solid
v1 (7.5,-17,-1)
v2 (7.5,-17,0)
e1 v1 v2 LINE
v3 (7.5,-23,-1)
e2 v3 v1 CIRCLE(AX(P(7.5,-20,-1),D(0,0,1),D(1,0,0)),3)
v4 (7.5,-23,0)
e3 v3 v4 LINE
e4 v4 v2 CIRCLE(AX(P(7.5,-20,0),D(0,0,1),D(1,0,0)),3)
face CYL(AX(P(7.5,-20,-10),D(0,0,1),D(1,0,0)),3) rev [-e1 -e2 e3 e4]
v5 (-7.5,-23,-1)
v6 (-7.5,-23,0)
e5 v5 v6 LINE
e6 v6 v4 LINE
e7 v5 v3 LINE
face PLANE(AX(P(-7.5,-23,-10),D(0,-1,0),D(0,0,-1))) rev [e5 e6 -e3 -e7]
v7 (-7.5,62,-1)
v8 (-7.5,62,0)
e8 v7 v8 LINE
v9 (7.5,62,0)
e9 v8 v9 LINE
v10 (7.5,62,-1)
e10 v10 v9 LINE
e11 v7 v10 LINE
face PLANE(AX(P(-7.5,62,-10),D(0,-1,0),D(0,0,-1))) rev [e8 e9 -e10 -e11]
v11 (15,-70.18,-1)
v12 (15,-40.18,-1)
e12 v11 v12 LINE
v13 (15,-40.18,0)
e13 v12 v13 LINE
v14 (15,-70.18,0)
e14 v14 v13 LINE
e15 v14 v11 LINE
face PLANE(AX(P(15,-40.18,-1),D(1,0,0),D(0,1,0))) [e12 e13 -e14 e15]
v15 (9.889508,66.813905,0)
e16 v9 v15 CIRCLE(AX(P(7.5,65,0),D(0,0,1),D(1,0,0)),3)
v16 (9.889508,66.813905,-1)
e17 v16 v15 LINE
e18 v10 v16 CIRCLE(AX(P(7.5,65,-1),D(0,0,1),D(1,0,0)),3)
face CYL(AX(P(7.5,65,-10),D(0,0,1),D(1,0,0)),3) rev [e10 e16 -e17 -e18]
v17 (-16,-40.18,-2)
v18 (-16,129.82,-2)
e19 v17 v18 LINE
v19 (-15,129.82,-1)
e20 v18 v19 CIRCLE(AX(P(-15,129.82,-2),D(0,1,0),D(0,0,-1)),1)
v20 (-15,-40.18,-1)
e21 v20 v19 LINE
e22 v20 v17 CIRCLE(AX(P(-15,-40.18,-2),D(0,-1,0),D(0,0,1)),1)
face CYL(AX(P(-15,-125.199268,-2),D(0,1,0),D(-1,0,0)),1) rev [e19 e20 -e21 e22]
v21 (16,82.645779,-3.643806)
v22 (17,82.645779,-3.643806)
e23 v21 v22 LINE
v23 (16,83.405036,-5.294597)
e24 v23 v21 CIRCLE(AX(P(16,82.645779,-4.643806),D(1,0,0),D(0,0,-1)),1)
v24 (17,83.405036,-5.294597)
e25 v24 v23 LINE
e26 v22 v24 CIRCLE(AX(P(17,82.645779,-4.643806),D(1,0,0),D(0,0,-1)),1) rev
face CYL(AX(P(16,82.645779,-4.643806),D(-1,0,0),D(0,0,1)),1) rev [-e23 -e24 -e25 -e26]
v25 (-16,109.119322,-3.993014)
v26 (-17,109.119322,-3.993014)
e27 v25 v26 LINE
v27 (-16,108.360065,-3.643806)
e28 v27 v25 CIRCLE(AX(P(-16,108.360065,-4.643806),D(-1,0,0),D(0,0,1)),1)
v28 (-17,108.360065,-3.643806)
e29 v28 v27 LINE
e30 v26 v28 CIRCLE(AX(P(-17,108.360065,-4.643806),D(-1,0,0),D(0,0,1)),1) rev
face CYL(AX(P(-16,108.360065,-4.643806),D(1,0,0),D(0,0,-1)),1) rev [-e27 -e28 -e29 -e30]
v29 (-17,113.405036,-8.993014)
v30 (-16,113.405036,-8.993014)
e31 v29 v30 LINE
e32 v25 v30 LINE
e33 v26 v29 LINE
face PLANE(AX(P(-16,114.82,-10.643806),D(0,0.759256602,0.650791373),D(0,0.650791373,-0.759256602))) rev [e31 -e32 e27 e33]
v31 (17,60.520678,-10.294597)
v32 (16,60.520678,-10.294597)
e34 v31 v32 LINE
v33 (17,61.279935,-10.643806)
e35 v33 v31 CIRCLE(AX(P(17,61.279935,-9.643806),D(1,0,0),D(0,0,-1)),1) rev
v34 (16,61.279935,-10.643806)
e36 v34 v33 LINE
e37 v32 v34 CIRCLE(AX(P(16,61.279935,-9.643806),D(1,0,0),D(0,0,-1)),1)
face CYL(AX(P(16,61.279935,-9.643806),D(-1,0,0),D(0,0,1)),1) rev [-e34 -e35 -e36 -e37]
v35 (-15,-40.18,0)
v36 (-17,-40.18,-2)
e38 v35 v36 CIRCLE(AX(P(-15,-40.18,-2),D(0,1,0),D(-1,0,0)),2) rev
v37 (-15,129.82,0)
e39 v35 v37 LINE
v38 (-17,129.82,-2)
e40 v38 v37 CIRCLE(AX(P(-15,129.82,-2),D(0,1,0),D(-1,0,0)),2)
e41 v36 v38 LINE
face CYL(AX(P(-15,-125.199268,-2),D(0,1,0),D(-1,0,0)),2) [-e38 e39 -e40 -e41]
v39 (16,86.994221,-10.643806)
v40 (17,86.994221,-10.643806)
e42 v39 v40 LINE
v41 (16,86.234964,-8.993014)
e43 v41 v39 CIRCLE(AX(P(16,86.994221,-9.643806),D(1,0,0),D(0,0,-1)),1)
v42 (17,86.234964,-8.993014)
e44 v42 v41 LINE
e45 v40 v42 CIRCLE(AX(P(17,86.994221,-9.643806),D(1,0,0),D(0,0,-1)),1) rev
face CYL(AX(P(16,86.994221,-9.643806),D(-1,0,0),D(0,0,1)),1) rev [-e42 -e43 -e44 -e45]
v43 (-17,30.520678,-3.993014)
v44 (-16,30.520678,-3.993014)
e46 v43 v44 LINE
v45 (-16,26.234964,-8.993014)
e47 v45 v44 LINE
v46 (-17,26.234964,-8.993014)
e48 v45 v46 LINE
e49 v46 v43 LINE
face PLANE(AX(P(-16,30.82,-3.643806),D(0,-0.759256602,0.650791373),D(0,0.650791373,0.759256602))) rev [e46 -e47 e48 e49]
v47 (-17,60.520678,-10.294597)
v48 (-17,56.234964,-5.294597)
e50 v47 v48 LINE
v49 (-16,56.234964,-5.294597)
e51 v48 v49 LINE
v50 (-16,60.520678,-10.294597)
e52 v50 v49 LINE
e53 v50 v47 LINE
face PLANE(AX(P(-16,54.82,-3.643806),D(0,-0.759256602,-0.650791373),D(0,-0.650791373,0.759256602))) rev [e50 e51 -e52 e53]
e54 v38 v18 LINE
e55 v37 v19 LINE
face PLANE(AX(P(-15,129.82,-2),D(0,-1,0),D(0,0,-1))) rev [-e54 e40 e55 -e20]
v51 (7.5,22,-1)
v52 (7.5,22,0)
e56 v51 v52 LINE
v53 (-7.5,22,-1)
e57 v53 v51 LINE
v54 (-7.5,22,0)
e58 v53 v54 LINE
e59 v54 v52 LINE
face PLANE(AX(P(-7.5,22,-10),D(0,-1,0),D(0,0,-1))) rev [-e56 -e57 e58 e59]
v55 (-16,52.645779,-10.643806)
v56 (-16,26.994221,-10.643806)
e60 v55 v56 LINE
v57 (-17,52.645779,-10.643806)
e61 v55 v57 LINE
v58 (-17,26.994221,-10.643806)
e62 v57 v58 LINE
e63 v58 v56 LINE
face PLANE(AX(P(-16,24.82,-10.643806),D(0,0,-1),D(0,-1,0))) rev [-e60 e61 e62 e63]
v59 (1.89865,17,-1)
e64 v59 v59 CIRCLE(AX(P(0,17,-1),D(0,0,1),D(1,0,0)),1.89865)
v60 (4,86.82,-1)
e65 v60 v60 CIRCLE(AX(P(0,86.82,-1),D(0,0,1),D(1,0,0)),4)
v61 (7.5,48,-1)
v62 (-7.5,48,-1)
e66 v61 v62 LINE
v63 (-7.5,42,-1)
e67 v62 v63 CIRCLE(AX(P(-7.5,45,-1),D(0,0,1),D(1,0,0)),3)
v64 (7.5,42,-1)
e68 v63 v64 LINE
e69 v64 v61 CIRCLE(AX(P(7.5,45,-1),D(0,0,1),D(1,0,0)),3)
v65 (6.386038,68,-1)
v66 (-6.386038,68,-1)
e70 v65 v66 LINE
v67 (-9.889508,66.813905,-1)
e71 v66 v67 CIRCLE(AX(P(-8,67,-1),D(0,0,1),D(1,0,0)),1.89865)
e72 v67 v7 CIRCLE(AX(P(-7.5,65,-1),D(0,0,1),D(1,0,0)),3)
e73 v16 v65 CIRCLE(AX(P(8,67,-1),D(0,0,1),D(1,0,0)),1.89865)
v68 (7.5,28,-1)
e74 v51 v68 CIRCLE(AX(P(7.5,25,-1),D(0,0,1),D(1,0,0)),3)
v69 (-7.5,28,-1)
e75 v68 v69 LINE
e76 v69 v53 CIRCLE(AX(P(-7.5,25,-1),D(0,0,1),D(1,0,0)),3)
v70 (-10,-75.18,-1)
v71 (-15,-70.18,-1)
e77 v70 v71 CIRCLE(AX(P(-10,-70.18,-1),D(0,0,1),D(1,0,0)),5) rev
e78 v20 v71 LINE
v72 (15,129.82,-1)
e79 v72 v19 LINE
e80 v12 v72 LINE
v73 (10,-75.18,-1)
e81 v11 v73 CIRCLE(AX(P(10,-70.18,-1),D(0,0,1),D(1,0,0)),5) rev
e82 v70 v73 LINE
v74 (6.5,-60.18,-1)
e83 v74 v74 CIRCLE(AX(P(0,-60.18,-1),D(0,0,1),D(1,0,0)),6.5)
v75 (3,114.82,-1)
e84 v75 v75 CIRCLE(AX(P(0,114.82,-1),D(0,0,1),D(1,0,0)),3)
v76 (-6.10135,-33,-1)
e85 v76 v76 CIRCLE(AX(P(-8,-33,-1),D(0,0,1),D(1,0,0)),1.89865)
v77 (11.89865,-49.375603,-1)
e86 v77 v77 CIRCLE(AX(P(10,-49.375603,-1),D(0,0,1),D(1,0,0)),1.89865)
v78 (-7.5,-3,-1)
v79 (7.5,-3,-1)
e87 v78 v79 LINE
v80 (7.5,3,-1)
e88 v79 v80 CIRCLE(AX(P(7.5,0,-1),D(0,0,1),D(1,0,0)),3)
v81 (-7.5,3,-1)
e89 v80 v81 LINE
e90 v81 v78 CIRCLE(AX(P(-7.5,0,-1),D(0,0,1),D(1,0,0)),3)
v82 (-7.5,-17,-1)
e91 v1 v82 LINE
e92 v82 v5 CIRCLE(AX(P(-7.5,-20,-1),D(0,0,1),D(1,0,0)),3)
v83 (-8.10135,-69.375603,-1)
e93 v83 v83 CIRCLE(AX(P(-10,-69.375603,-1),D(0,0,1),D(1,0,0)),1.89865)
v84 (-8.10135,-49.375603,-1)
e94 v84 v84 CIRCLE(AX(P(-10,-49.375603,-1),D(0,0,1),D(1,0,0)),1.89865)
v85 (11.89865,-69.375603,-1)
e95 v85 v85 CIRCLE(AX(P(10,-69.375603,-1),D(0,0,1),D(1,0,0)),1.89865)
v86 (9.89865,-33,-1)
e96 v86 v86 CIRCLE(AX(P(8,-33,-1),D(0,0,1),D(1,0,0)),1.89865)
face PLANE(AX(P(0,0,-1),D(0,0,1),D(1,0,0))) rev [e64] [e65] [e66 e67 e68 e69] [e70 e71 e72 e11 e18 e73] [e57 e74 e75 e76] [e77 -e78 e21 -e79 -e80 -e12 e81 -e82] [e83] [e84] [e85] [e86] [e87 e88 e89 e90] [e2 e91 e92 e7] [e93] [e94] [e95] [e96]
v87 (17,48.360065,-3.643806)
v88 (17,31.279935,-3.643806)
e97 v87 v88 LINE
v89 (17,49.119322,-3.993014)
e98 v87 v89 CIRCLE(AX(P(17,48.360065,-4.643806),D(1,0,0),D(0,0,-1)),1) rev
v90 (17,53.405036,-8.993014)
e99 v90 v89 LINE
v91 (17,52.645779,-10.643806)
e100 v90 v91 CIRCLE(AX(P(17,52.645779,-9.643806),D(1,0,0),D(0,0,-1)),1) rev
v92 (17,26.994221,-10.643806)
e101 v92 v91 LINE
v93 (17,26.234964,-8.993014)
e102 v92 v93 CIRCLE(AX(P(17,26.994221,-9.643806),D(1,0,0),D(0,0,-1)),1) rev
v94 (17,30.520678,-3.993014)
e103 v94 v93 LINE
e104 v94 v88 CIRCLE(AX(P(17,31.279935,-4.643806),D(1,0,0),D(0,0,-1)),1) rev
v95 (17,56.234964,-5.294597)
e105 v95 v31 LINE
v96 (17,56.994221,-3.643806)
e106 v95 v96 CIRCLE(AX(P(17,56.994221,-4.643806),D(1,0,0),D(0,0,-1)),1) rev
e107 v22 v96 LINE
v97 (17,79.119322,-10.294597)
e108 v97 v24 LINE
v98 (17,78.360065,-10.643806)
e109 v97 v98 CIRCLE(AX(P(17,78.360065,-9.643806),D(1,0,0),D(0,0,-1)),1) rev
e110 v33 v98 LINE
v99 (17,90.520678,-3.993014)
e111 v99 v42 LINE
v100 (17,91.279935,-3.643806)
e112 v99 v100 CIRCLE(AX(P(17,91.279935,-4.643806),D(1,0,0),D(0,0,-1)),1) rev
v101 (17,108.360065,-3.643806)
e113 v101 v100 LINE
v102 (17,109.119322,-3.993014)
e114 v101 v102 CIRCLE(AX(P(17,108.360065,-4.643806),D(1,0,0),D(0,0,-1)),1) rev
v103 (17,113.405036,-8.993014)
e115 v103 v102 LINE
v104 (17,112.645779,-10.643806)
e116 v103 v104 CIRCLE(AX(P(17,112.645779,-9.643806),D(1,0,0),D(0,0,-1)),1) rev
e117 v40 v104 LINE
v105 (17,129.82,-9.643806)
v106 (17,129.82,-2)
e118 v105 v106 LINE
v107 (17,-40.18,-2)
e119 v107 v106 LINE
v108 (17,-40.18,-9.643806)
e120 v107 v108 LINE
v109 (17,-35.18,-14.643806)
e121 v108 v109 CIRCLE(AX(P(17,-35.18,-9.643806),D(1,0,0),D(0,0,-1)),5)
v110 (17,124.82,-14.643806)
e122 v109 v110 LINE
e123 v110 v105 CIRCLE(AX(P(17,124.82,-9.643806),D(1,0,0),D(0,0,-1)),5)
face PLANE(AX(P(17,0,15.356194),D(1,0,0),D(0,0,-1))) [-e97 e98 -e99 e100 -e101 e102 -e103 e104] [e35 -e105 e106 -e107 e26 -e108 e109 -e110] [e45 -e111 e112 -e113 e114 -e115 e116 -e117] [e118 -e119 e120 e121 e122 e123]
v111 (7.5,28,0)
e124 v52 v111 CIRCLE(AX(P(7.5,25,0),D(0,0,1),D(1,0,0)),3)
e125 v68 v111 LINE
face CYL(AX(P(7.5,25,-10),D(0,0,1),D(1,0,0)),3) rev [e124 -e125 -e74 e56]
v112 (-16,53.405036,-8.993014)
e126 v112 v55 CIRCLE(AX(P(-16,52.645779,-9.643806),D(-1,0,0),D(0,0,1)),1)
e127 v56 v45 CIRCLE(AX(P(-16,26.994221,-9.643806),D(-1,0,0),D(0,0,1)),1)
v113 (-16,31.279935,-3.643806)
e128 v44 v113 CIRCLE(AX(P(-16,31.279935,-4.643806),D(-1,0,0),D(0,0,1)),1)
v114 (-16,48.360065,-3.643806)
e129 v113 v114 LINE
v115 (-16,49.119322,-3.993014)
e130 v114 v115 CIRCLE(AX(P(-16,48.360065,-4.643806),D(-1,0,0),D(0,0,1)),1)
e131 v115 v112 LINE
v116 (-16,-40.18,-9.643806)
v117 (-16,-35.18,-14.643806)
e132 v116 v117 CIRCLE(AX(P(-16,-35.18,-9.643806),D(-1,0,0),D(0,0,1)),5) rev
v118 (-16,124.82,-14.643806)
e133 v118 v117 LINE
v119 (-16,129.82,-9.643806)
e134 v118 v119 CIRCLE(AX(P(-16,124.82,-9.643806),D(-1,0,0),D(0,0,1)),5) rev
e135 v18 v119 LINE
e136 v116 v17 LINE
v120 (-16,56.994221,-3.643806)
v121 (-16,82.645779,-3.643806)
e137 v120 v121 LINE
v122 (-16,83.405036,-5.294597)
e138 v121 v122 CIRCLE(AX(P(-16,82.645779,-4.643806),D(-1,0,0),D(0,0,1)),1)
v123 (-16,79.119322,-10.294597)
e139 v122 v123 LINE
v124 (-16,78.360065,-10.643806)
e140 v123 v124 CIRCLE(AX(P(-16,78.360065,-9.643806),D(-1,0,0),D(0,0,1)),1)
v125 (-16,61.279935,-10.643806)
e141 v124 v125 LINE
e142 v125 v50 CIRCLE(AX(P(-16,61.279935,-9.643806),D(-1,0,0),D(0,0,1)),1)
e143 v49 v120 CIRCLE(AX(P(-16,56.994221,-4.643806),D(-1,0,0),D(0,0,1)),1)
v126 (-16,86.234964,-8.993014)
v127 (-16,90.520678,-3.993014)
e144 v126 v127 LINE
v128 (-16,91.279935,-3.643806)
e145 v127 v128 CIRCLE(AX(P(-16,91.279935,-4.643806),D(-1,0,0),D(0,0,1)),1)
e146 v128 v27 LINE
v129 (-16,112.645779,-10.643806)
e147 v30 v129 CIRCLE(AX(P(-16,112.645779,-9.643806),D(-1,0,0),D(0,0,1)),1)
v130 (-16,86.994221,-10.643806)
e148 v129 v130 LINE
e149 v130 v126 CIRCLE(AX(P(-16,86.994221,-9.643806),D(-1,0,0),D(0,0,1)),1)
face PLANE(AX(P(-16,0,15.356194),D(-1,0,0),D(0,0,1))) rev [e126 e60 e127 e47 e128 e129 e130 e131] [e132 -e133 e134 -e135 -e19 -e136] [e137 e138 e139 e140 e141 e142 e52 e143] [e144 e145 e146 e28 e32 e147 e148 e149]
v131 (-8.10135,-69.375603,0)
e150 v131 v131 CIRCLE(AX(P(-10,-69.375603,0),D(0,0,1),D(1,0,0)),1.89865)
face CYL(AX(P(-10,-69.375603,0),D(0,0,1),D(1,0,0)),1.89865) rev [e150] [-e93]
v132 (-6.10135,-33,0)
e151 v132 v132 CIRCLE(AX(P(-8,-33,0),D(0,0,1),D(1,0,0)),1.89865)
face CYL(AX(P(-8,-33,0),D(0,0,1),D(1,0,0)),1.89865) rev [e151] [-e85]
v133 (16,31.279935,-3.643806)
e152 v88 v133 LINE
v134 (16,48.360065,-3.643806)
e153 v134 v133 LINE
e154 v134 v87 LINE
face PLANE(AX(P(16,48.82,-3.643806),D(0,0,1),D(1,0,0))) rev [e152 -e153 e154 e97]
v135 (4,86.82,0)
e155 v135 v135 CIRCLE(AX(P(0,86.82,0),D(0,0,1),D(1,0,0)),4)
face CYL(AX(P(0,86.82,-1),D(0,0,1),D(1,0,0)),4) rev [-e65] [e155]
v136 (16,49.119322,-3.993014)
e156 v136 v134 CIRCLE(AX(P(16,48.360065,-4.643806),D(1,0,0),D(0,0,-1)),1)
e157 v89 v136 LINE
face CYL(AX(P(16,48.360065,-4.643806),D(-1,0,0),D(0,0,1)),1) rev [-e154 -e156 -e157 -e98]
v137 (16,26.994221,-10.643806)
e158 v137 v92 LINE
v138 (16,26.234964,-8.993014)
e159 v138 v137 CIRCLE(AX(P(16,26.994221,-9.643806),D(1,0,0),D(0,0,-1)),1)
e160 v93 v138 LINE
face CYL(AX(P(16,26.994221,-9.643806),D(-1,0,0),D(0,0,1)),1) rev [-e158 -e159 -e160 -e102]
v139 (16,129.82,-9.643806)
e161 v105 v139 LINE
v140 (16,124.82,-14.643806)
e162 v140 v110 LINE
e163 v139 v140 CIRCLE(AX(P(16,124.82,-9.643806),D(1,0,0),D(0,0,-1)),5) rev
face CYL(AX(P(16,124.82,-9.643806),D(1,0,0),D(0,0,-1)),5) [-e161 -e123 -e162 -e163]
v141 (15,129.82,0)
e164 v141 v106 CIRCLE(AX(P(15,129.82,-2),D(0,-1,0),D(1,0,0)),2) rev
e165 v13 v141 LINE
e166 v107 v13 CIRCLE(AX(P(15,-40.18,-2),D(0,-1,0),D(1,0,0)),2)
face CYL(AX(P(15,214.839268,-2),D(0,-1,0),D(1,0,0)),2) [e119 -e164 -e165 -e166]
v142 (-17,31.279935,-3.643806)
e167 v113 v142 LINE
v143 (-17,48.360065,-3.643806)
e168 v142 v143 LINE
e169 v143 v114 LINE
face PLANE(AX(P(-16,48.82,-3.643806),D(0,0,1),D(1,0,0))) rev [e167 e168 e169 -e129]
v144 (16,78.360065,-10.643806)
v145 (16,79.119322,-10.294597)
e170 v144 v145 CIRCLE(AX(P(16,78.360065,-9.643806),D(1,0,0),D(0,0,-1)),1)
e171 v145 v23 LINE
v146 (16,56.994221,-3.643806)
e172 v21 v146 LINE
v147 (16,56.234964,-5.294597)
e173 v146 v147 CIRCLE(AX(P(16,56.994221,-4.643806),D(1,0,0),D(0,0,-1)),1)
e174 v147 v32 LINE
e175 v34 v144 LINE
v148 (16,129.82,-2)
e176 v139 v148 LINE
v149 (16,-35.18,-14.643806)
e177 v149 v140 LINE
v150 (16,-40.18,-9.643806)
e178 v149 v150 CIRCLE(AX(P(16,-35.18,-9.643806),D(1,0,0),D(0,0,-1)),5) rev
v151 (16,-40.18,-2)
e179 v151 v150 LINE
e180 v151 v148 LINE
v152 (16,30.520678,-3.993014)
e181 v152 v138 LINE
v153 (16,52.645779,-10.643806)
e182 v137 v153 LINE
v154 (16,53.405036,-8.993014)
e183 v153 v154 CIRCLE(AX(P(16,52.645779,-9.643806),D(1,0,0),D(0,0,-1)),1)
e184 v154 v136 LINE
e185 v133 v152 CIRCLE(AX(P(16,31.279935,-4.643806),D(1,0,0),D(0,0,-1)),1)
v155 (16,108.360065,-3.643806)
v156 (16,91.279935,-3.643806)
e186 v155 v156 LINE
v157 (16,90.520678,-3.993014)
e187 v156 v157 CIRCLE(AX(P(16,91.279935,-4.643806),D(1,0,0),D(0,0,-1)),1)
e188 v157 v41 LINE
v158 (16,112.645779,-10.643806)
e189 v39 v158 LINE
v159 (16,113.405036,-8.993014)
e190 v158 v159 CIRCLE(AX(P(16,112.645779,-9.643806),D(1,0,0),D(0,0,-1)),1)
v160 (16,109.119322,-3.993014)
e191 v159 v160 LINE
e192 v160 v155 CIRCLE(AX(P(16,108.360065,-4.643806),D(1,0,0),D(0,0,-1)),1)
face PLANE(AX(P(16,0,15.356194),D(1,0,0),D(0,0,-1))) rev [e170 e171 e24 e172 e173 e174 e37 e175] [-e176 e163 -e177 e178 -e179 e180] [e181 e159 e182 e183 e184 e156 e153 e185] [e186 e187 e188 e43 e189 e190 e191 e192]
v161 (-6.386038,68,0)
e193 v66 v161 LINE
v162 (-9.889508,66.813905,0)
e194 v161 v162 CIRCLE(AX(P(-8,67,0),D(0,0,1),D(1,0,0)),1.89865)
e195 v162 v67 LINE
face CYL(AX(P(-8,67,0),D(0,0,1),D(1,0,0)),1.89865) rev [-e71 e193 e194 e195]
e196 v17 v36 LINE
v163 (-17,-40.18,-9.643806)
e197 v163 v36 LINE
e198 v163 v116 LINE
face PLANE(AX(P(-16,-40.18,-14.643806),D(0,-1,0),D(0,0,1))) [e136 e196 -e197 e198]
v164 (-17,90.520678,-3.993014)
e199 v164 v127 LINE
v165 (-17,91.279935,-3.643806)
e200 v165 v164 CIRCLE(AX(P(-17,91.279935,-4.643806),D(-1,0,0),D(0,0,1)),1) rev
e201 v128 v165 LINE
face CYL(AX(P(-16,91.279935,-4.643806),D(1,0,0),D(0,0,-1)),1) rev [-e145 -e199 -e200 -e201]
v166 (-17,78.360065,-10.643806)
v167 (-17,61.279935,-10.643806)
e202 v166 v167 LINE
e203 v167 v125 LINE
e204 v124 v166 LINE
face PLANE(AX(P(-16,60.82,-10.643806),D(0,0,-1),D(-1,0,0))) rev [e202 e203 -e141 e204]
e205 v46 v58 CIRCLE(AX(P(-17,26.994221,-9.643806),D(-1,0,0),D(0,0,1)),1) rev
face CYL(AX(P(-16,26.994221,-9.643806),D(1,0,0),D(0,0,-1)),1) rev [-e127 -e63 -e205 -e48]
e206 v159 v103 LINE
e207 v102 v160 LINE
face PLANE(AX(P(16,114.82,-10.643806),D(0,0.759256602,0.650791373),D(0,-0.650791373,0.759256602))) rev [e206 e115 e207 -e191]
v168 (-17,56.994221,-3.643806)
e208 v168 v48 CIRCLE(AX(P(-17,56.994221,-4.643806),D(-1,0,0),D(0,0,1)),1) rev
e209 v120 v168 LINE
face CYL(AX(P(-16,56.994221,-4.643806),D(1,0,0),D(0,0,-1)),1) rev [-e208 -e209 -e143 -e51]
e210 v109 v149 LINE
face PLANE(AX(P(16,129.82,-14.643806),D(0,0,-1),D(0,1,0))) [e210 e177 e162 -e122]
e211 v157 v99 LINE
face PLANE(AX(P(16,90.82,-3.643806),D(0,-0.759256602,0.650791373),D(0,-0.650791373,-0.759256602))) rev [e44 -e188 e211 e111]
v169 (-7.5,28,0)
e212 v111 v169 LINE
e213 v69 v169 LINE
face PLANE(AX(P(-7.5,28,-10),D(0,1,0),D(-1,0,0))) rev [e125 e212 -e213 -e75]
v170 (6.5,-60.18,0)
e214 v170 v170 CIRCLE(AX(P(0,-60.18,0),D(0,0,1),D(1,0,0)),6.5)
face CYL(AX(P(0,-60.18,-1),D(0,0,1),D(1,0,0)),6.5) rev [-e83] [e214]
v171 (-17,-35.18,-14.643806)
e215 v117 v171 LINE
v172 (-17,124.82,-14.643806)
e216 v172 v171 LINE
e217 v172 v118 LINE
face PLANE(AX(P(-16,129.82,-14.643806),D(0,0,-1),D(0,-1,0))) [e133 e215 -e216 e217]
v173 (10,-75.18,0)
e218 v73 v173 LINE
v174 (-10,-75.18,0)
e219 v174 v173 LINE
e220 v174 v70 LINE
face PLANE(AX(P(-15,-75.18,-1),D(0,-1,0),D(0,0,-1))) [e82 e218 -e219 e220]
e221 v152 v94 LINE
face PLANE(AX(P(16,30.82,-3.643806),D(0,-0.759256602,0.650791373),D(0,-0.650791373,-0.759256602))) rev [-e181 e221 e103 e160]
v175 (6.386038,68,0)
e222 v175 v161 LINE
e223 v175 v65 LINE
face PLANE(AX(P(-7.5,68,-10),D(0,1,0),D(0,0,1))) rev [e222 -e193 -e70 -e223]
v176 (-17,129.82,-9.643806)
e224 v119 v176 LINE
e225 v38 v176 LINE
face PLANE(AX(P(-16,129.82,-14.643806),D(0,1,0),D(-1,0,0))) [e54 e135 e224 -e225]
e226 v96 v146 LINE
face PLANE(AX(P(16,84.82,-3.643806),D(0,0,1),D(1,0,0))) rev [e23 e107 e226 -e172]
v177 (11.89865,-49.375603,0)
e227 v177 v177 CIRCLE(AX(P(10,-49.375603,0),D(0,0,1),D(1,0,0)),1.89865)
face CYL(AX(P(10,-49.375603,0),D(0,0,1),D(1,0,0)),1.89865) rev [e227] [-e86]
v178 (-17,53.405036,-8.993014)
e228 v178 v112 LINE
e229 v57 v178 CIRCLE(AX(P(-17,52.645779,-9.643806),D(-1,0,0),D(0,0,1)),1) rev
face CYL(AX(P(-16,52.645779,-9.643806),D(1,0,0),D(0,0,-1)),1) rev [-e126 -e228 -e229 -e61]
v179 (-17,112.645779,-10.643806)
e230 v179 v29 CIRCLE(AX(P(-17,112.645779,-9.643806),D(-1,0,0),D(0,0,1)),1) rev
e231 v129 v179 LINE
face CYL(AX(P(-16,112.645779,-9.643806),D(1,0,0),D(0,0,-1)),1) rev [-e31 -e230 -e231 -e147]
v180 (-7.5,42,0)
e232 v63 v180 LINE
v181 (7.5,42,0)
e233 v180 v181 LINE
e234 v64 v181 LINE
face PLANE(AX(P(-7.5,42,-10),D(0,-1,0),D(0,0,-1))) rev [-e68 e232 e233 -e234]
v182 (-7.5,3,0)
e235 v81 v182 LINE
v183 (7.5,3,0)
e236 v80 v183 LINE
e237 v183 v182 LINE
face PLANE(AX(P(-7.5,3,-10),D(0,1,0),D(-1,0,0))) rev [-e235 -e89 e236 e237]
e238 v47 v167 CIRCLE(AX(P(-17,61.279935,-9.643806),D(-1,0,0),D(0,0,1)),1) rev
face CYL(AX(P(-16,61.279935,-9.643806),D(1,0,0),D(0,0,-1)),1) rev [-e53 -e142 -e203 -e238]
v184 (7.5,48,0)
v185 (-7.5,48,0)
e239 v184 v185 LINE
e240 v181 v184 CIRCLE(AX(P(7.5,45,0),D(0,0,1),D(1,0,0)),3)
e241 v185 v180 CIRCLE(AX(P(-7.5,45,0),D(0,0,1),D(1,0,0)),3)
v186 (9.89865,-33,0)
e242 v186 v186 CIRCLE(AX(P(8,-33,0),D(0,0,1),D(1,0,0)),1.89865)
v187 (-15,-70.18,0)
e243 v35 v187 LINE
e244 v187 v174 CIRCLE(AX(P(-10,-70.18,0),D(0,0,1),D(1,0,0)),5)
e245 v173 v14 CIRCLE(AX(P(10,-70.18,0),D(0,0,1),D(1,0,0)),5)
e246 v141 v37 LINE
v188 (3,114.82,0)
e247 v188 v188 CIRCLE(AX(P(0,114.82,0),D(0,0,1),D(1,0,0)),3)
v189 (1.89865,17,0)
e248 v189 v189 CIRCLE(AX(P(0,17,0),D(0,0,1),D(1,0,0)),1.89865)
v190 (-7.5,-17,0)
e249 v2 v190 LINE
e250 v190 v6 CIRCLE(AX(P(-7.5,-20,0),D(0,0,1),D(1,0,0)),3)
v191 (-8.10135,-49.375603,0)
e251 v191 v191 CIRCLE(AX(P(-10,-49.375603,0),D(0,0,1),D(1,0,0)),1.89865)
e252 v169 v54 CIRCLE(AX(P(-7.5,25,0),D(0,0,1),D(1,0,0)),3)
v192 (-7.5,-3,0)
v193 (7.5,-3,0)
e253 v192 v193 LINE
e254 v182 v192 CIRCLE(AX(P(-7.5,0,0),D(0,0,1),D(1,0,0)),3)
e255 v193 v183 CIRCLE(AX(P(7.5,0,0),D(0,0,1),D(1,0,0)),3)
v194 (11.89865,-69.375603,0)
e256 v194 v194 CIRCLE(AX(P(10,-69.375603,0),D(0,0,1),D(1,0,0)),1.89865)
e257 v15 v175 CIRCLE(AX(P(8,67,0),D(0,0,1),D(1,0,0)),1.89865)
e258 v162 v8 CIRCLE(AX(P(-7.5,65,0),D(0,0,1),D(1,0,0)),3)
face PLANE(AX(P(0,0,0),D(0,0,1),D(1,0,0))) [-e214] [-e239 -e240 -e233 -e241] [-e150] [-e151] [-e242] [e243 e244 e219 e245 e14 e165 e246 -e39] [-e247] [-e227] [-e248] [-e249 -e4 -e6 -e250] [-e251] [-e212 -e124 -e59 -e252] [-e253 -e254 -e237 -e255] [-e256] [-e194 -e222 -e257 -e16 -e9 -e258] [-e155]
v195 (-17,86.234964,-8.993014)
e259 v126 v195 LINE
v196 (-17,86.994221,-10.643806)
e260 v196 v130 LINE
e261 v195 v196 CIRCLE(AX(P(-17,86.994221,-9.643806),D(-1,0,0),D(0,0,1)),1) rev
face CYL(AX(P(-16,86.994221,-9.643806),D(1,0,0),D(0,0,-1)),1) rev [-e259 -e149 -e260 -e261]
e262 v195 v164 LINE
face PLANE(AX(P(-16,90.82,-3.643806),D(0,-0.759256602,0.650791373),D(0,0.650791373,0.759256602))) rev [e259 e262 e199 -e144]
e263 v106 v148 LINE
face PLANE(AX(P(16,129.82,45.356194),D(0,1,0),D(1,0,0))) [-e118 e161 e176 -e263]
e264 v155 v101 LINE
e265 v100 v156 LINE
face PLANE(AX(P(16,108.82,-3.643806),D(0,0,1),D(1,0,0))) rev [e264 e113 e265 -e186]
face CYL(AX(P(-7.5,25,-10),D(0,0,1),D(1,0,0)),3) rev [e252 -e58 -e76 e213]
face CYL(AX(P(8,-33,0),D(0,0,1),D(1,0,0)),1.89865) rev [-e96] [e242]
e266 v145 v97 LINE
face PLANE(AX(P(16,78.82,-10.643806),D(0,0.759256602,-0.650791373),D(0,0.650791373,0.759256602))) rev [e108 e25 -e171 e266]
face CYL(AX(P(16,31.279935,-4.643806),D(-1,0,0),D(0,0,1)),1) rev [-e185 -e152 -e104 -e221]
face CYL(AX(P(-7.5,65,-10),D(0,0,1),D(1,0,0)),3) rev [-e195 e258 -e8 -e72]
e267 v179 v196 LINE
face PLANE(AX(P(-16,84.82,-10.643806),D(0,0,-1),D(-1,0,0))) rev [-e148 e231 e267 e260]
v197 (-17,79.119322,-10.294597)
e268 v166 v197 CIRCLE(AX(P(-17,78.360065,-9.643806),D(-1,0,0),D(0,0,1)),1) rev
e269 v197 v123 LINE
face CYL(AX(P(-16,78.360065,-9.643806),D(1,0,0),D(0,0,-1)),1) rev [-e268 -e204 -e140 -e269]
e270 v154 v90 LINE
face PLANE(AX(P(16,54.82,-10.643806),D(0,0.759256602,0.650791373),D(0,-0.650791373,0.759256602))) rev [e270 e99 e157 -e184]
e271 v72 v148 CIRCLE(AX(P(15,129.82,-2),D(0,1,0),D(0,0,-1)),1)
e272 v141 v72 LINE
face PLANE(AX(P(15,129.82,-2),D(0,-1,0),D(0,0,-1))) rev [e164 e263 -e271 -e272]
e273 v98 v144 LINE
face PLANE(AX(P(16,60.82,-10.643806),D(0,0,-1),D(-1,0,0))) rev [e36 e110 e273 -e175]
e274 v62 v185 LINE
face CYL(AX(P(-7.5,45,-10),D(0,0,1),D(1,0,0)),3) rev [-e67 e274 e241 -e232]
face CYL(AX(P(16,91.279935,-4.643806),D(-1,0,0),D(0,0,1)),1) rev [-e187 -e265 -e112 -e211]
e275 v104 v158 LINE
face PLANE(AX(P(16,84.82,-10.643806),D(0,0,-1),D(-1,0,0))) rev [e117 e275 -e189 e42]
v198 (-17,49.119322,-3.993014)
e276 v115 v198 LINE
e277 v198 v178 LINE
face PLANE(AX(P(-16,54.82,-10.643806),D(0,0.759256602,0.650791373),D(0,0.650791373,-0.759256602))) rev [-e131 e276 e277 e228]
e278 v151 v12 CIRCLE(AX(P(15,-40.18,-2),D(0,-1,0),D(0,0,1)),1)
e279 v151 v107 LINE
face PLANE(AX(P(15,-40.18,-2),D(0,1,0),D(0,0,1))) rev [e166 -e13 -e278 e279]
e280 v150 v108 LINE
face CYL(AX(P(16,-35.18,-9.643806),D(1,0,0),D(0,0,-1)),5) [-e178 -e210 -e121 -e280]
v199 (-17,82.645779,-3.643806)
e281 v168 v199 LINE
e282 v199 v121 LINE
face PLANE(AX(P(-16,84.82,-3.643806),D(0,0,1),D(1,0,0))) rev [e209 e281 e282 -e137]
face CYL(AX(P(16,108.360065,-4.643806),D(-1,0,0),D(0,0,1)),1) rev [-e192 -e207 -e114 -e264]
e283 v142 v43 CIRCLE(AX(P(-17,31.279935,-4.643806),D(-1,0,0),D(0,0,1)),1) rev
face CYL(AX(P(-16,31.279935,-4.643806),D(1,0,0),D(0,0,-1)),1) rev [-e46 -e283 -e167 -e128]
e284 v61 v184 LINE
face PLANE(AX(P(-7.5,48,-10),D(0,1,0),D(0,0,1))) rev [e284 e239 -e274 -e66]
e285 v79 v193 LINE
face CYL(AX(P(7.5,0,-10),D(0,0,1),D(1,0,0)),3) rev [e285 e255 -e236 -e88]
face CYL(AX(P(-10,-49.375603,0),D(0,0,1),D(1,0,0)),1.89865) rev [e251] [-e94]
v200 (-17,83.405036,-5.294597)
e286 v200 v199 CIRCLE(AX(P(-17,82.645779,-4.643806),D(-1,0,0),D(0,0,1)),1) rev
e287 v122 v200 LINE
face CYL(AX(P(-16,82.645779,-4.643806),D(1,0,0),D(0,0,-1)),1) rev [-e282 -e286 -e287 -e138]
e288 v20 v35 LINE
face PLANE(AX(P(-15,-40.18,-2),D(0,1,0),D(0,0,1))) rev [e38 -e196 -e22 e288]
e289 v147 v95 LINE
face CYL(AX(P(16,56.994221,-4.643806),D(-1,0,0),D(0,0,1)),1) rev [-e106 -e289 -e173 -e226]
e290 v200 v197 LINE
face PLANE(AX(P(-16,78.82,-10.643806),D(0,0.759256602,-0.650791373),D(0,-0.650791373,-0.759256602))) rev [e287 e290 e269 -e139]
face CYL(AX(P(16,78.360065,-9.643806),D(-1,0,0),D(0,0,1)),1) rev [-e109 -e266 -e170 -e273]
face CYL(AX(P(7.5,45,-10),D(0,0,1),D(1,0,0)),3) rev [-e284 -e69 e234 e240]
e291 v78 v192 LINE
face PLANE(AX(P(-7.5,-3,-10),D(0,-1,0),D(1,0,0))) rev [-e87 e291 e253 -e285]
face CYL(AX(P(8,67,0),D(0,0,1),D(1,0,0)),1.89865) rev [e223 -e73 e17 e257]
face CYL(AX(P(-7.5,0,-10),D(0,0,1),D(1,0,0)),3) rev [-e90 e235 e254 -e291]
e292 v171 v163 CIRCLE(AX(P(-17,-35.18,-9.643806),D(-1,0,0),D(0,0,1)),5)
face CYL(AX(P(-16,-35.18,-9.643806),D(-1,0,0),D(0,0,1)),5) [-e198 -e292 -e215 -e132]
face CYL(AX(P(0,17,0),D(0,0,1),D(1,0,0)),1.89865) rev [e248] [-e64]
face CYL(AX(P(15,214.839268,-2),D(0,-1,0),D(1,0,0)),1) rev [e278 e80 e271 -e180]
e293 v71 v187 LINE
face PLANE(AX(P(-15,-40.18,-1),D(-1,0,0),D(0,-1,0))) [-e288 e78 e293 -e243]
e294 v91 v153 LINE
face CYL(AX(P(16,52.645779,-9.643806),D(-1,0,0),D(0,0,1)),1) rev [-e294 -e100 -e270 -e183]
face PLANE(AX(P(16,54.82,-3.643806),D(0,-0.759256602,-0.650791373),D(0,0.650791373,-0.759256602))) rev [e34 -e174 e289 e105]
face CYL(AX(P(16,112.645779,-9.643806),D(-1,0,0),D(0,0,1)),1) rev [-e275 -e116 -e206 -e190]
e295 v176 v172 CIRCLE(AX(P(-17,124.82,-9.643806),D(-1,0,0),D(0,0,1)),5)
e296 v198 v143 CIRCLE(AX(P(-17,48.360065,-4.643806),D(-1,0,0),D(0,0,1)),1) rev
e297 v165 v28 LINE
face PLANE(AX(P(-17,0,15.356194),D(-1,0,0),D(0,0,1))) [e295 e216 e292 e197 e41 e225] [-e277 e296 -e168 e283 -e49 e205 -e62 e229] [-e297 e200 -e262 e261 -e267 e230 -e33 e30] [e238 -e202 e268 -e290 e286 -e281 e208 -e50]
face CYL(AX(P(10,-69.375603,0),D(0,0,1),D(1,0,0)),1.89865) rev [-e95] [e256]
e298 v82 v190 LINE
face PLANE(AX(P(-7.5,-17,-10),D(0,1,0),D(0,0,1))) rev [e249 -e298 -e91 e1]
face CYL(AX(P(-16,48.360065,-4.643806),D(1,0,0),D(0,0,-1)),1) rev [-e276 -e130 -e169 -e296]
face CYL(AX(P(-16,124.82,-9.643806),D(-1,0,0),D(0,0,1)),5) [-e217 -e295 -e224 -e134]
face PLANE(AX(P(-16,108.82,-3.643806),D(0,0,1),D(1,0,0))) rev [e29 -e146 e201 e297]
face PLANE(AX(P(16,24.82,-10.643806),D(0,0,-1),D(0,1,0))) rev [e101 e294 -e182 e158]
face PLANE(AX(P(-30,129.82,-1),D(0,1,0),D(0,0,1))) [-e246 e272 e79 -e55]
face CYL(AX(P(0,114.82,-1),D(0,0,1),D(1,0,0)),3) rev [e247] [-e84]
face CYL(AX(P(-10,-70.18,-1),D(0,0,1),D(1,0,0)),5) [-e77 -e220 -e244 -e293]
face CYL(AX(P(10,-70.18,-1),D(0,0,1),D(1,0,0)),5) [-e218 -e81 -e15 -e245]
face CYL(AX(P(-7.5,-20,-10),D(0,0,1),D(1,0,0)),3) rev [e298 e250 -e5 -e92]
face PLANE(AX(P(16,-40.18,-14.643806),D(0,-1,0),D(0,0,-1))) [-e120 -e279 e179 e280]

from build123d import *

# Parameters (mm, degrees)
SKETCH1_R                  = 6.5
SKETCH1_R_2                = 3
SKETCH1_R_3                = 4
BASE_FLANGE1_DEPTH         = 1
FILLET1_R                  = 5
SKETCHED_START             = 16.78876
SKETCHED_BEND1_OUTLINE_W   = 170
SKETCHED_BEND1_OUTLINE_H   = 1
SKETCHED_BEND1_DEPTH       = 13.21124
SKETCHED_START_2           = -30
SKETCHED_BEND1_2_OUTLINE_W = 170
SKETCHED_BEND1_2_OUTLINE_H = 1
SKETCHED_BEND1_2_DEPTH     = 13.18876
SKETCHED_START_3           = 16
SKETCHED_BEND1_3_DEPTH     = 0.0274
SKETCHED_START_4           = -16.01124
SKETCHED_BEND1_4_DEPTH     = 0.01124
SKETCHED_START_5           = -17
SKETCHED_BEND1_5_DEPTH     = 2
SKETCHED_START_6           = 15
SKETCHED_BEND1_6_DEPTH     = 2
SKETCHED_START_7           = -40.18
SKETCHED_BEND1_7_DEPTH     = 170
FILLET2_R                  = 1
F_6_CLEARANCE_HOLE2_D      = 3.7973
CUT_EXTRUDE1_DEPTH         = 10


with BuildPart() as part:
    # Base-Flange1: sheet metal written as solids
    # Sketch1 → Base-Flange1 (new body)
    with BuildSketch(Plane.XY):
        Polygon((-30, 129.82), (30, 129.82), (30, -40.18), (15, -40.18), (15, -75.18), (-15, -75.18), (-15, -40.18), (-30, -40.18), align=None)
        with Locations((0, -60.18)):
            Circle(SKETCH1_R, mode=Mode.SUBTRACT)
        with Locations((0, 114.82)):
            Circle(SKETCH1_R_2, mode=Mode.SUBTRACT)
        with Locations((0, 86.82)):
            Circle(SKETCH1_R_3, mode=Mode.SUBTRACT)
        Polygon((-26, 114.82), (-19, 108.82), (-19, 90.82), (-26, 84.82), align=None, mode=Mode.SUBTRACT)
        Polygon((-26, 78.82), (-19, 84.82), (-19, 54.82), (-26, 60.82), align=None, mode=Mode.SUBTRACT)
        Polygon((-26, 24.82), (-26, 54.82), (-19, 48.82), (-19, 30.82), align=None, mode=Mode.SUBTRACT)
        Polygon((19, 30.82), (26, 24.82), (26, 54.82), (19, 48.82), align=None, mode=Mode.SUBTRACT)
        Polygon((19, 54.82), (26, 60.82), (26, 78.82), (19, 84.82), align=None, mode=Mode.SUBTRACT)
        Polygon((19, 90.82), (26, 84.82), (26, 114.82), (19, 108.82), align=None, mode=Mode.SUBTRACT)
    extrude(amount=-BASE_FLANGE1_DEPTH)

    # Fillet1
    fillet1_edges = [part.edges().sort_by_distance(p)[0] for p in [
        (-30, 129.82, -0.5),
        (30, 129.82, -0.5),
        (30, -40.18, -0.5),
        (15, -75.18, -0.5),
        (-15, -75.18, -0.5),
        (-30, -40.18, -0.5),
    ]]
    fillet(fillet1_edges, radius=FILLET1_R)

    # Sketched Bend1: read off the stored shape, not the designer's step
    # Sketched Bend1 outline → Sketched Bend1 (cut)
    with BuildSketch(Plane.YZ.offset(SKETCHED_START)):
        with Locations((44.82, -0.5)):
            Rectangle(SKETCHED_BEND1_OUTLINE_W, SKETCHED_BEND1_OUTLINE_H)
    extrude(amount=SKETCHED_BEND1_DEPTH, mode=Mode.SUBTRACT)

    # Sketched Bend1 2 outline → Sketched Bend1 2 (cut)
    with BuildSketch(Plane.YZ.offset(SKETCHED_START_2)):
        with Locations((44.82, -0.5)):
            Rectangle(SKETCHED_BEND1_2_OUTLINE_W, SKETCHED_BEND1_2_OUTLINE_H)
    extrude(amount=SKETCHED_BEND1_2_DEPTH, mode=Mode.SUBTRACT)

    # Sketched Bend1 3 outline → Sketched Bend1 3 (add)
    with BuildSketch(Plane.YZ.offset(SKETCHED_START_3)):
        with BuildLine():
            Line((129.82, -9.64380551), (129.82, -1))
            Line((129.82, -1), (-40.18, -1))
            Line((-40.18, -1), (-40.18, -9.64380551))
            ThreePointArc((-40.18, -9.64380551), (-38.715533906, -13.179339416), (-35.18, -14.64380551))
            Line((-35.18, -14.64380551), (124.82, -14.64380551))
            ThreePointArc((124.82, -14.64380551), (128.355533906, -13.179339416), (129.82, -9.64380551))
        make_face()
        Polygon((30.82, -3.64380551), (48.82, -3.64380551), (54.82, -10.64380551), (24.82, -10.64380551), align=None, mode=Mode.SUBTRACT)
        Polygon((54.82, -3.64380551), (84.82, -3.64380551), (78.82, -10.64380551), (60.82, -10.64380551), align=None, mode=Mode.SUBTRACT)
        Polygon((90.82, -3.64380551), (108.82, -3.64380551), (114.82, -10.64380551), (84.82, -10.64380551), align=None, mode=Mode.SUBTRACT)
    extrude(amount=SKETCHED_BEND1_3_DEPTH)

    # Sketched Bend1 4 outline → Sketched Bend1 4 (add)
    with BuildSketch(Plane.YZ.offset(SKETCHED_START_4)):
        with BuildLine():
            Line((129.82, -9.64380551), (129.82, -1))
            Line((129.82, -1), (-40.18, -1))
            Line((-40.18, -1), (-40.18, -9.64380551))
            ThreePointArc((-40.18, -9.64380551), (-38.715533906, -13.179339416), (-35.18, -14.64380551))
            Line((-35.18, -14.64380551), (124.82, -14.64380551))
            ThreePointArc((124.82, -14.64380551), (128.355533906, -13.179339416), (129.82, -9.64380551))
        make_face()
        Polygon((30.82, -3.64380551), (48.82, -3.64380551), (54.82, -10.64380551), (24.82, -10.64380551), align=None, mode=Mode.SUBTRACT)
        Polygon((54.82, -3.64380551), (84.82, -3.64380551), (78.82, -10.64380551), (60.82, -10.64380551), align=None, mode=Mode.SUBTRACT)
        Polygon((90.82, -3.64380551), (108.82, -3.64380551), (114.82, -10.64380551), (84.82, -10.64380551), align=None, mode=Mode.SUBTRACT)
    extrude(amount=SKETCHED_BEND1_4_DEPTH)

    # Sketched Bend1 5 outline → Sketched Bend1 5 (add)
    with BuildSketch(Plane.YZ.offset(SKETCHED_START_5)):
        with BuildLine():
            Line((129.82, -9.64380551), (129.82, -1))
            Line((129.82, -1), (-40.18, -1))
            Line((-40.18, -1), (-40.18, -9.64380551))
            ThreePointArc((-40.18, -9.64380551), (-38.715533906, -13.179339416), (-35.18, -14.64380551))
            Line((-35.18, -14.64380551), (124.82, -14.64380551))
            ThreePointArc((124.82, -14.64380551), (128.355533906, -13.179339416), (129.82, -9.64380551))
        make_face()
        Polygon((30.82, -3.64380551), (48.82, -3.64380551), (54.82, -10.64380551), (24.82, -10.64380551), align=None, mode=Mode.SUBTRACT)
        Polygon((54.82, -3.64380551), (84.82, -3.64380551), (78.82, -10.64380551), (60.82, -10.64380551), align=None, mode=Mode.SUBTRACT)
        Polygon((90.82, -3.64380551), (108.82, -3.64380551), (114.82, -10.64380551), (84.82, -10.64380551), align=None, mode=Mode.SUBTRACT)
    extrude(amount=SKETCHED_BEND1_5_DEPTH)

    # Sketched Bend1 6 outline → Sketched Bend1 6 (add)
    with BuildSketch(Plane.YZ.offset(SKETCHED_START_6)):
        with BuildLine():
            Line((129.82, -9.64380551), (129.82, -1))
            Line((129.82, -1), (-40.18, -1))
            Line((-40.18, -1), (-40.18, -9.64380551))
            ThreePointArc((-40.18, -9.64380551), (-38.715533906, -13.179339416), (-35.18, -14.64380551))
            Line((-35.18, -14.64380551), (124.82, -14.64380551))
            ThreePointArc((124.82, -14.64380551), (128.355533906, -13.179339416), (129.82, -9.64380551))
        make_face()
        Polygon((30.82, -3.64380551), (48.82, -3.64380551), (54.82, -10.64380551), (24.82, -10.64380551), align=None, mode=Mode.SUBTRACT)
        Polygon((54.82, -3.64380551), (84.82, -3.64380551), (78.82, -10.64380551), (60.82, -10.64380551), align=None, mode=Mode.SUBTRACT)
        Polygon((90.82, -3.64380551), (108.82, -3.64380551), (114.82, -10.64380551), (84.82, -10.64380551), align=None, mode=Mode.SUBTRACT)
    extrude(amount=SKETCHED_BEND1_6_DEPTH)

    # Sketched Bend1 7 outline → Sketched Bend1 7 (cut)
    with BuildSketch(Plane(origin=(0, 0, 0), x_dir=(1, 0, 0), z_dir=(0, 1, 0)).offset(SKETCHED_START_7)):
        with BuildLine():
            ThreePointArc((-16, 2), (-15.707106781, 1.292893219), (-15, 1))
            Line((-15, 1), (-15, 14.64380551))
            Line((-15, 14.64380551), (-16, 14.64380551))
            Line((-16, 14.64380551), (-16, 2))
        make_face()
        with BuildLine():
            ThreePointArc((17, 2), (16.414213562, 0.585786438), (15, 0))
            Line((15, 0), (16.78876, 0))
            Line((16.78876, 0), (16.78876, 1))
            Line((16.78876, 1), (17, 1))
            Line((17, 1), (17, 2))
        make_face()
        with BuildLine():
            ThreePointArc((-15, 0), (-16.414213562, 0.585786438), (-17, 2))
            Line((-17, 2), (-17, 1))
            Line((-17, 1), (-16.81124, 1))
            Line((-16.81124, 1), (-16.81124, 0))
            Line((-16.81124, 0), (-15, 0))
        make_face()
        with BuildLine():
            ThreePointArc((15, 1), (15.707106781, 1.292893219), (16, 2))
            Line((16, 2), (16, 14.64380551))
            Line((16, 14.64380551), (15, 14.64380551))
            Line((15, 14.64380551), (15, 1))
        make_face()
    extrude(amount=SKETCHED_BEND1_7_DEPTH, mode=Mode.SUBTRACT)

    # Fillet2
    fillet2_edges = [part.edges().sort_by_distance(p)[0] for p in [
        (-16.5, 90.82, -3.64380551),
        (-16.5, 84.82, -10.64380551),
        (-16.5, 114.82, -10.64380551),
        (-16.5, 108.82, -3.64380551),
        (-16.5, 84.82, -3.64380551),
        (-16.5, 54.82, -3.64380551),
        (-16.5, 60.82, -10.64380551),
        (-16.5, 78.82, -10.64380551),
        (-16.5, 24.82, -10.64380551),
        (-16.5, 54.82, -10.64380551),
        (-16.5, 48.82, -3.64380551),
        (-16.5, 30.82, -3.64380551),
        (16.5, 24.82, -10.64380551),
        (16.5, 30.82, -3.64380551),
        (16.5, 48.82, -3.64380551),
        (16.5, 54.82, -10.64380551),
        (16.5, 60.82, -10.64380551),
        (16.5, 54.82, -3.64380551),
        (16.5, 84.82, -3.64380551),
        (16.5, 78.82, -10.64380551),
        (16.5, 84.82, -10.64380551),
        (16.5, 90.82, -3.64380551),
        (16.5, 108.82, -3.64380551),
        (16.5, 114.82, -10.64380551),
    ]]
    fillet(fillet2_edges, radius=FILLET2_R)

    # #6 Clearance Hole2 (through all)
    with Locations(Plane.XY):
        with Locations((-8, 67), (8, 67), (0, 17), (-8, -33), (8, -33), (-10, -49.375603427), (10, -49.375603427), (-10, -69.375603427), (10, -69.375603427), (28.213155681, -64.18604224)):
            Hole(F_6_CLEARANCE_HOLE2_D / 2)

    # Sketch13 → Cut-Extrude1 (cut)
    with BuildSketch(Plane.XY):
        with BuildLine():
            Line((-7.5, 3), (7.5, 3))
            ThreePointArc((7.5, 3), (10.5, 0), (7.5, -3))
            Line((7.5, -3), (-7.5, -3))
            ThreePointArc((-7.5, -3), (-10.5, 0), (-7.5, 3))
        make_face()
        with BuildLine():
            Line((-7.5, -17), (7.5, -17))
            ThreePointArc((7.5, -17), (10.5, -20), (7.5, -23))
            Line((7.5, -23), (-7.5, -23))
            ThreePointArc((-7.5, -23), (-10.5, -20), (-7.5, -17))
        make_face()
        with BuildLine():
            Line((-7.5, 28), (7.5, 28))
            ThreePointArc((7.5, 28), (10.5, 25), (7.5, 22))
            Line((7.5, 22), (-7.5, 22))
            ThreePointArc((-7.5, 22), (-10.5, 25), (-7.5, 28))
        make_face()
        with BuildLine():
            Line((-7.5, 48), (7.5, 48))
            ThreePointArc((7.5, 48), (10.5, 45), (7.5, 42))
            Line((7.5, 42), (-7.5, 42))
            ThreePointArc((-7.5, 42), (-10.5, 45), (-7.5, 48))
        make_face()
        with BuildLine():
            Line((-7.5, 68), (7.5, 68))
            ThreePointArc((7.5, 68), (10.5, 65), (7.5, 62))
            Line((7.5, 62), (-7.5, 62))
            ThreePointArc((-7.5, 62), (-10.5, 65), (-7.5, 68))
        make_face()
    extrude(amount=-CUT_EXTRUDE1_DEPTH, mode=Mode.SUBTRACT)


solid = part.part
